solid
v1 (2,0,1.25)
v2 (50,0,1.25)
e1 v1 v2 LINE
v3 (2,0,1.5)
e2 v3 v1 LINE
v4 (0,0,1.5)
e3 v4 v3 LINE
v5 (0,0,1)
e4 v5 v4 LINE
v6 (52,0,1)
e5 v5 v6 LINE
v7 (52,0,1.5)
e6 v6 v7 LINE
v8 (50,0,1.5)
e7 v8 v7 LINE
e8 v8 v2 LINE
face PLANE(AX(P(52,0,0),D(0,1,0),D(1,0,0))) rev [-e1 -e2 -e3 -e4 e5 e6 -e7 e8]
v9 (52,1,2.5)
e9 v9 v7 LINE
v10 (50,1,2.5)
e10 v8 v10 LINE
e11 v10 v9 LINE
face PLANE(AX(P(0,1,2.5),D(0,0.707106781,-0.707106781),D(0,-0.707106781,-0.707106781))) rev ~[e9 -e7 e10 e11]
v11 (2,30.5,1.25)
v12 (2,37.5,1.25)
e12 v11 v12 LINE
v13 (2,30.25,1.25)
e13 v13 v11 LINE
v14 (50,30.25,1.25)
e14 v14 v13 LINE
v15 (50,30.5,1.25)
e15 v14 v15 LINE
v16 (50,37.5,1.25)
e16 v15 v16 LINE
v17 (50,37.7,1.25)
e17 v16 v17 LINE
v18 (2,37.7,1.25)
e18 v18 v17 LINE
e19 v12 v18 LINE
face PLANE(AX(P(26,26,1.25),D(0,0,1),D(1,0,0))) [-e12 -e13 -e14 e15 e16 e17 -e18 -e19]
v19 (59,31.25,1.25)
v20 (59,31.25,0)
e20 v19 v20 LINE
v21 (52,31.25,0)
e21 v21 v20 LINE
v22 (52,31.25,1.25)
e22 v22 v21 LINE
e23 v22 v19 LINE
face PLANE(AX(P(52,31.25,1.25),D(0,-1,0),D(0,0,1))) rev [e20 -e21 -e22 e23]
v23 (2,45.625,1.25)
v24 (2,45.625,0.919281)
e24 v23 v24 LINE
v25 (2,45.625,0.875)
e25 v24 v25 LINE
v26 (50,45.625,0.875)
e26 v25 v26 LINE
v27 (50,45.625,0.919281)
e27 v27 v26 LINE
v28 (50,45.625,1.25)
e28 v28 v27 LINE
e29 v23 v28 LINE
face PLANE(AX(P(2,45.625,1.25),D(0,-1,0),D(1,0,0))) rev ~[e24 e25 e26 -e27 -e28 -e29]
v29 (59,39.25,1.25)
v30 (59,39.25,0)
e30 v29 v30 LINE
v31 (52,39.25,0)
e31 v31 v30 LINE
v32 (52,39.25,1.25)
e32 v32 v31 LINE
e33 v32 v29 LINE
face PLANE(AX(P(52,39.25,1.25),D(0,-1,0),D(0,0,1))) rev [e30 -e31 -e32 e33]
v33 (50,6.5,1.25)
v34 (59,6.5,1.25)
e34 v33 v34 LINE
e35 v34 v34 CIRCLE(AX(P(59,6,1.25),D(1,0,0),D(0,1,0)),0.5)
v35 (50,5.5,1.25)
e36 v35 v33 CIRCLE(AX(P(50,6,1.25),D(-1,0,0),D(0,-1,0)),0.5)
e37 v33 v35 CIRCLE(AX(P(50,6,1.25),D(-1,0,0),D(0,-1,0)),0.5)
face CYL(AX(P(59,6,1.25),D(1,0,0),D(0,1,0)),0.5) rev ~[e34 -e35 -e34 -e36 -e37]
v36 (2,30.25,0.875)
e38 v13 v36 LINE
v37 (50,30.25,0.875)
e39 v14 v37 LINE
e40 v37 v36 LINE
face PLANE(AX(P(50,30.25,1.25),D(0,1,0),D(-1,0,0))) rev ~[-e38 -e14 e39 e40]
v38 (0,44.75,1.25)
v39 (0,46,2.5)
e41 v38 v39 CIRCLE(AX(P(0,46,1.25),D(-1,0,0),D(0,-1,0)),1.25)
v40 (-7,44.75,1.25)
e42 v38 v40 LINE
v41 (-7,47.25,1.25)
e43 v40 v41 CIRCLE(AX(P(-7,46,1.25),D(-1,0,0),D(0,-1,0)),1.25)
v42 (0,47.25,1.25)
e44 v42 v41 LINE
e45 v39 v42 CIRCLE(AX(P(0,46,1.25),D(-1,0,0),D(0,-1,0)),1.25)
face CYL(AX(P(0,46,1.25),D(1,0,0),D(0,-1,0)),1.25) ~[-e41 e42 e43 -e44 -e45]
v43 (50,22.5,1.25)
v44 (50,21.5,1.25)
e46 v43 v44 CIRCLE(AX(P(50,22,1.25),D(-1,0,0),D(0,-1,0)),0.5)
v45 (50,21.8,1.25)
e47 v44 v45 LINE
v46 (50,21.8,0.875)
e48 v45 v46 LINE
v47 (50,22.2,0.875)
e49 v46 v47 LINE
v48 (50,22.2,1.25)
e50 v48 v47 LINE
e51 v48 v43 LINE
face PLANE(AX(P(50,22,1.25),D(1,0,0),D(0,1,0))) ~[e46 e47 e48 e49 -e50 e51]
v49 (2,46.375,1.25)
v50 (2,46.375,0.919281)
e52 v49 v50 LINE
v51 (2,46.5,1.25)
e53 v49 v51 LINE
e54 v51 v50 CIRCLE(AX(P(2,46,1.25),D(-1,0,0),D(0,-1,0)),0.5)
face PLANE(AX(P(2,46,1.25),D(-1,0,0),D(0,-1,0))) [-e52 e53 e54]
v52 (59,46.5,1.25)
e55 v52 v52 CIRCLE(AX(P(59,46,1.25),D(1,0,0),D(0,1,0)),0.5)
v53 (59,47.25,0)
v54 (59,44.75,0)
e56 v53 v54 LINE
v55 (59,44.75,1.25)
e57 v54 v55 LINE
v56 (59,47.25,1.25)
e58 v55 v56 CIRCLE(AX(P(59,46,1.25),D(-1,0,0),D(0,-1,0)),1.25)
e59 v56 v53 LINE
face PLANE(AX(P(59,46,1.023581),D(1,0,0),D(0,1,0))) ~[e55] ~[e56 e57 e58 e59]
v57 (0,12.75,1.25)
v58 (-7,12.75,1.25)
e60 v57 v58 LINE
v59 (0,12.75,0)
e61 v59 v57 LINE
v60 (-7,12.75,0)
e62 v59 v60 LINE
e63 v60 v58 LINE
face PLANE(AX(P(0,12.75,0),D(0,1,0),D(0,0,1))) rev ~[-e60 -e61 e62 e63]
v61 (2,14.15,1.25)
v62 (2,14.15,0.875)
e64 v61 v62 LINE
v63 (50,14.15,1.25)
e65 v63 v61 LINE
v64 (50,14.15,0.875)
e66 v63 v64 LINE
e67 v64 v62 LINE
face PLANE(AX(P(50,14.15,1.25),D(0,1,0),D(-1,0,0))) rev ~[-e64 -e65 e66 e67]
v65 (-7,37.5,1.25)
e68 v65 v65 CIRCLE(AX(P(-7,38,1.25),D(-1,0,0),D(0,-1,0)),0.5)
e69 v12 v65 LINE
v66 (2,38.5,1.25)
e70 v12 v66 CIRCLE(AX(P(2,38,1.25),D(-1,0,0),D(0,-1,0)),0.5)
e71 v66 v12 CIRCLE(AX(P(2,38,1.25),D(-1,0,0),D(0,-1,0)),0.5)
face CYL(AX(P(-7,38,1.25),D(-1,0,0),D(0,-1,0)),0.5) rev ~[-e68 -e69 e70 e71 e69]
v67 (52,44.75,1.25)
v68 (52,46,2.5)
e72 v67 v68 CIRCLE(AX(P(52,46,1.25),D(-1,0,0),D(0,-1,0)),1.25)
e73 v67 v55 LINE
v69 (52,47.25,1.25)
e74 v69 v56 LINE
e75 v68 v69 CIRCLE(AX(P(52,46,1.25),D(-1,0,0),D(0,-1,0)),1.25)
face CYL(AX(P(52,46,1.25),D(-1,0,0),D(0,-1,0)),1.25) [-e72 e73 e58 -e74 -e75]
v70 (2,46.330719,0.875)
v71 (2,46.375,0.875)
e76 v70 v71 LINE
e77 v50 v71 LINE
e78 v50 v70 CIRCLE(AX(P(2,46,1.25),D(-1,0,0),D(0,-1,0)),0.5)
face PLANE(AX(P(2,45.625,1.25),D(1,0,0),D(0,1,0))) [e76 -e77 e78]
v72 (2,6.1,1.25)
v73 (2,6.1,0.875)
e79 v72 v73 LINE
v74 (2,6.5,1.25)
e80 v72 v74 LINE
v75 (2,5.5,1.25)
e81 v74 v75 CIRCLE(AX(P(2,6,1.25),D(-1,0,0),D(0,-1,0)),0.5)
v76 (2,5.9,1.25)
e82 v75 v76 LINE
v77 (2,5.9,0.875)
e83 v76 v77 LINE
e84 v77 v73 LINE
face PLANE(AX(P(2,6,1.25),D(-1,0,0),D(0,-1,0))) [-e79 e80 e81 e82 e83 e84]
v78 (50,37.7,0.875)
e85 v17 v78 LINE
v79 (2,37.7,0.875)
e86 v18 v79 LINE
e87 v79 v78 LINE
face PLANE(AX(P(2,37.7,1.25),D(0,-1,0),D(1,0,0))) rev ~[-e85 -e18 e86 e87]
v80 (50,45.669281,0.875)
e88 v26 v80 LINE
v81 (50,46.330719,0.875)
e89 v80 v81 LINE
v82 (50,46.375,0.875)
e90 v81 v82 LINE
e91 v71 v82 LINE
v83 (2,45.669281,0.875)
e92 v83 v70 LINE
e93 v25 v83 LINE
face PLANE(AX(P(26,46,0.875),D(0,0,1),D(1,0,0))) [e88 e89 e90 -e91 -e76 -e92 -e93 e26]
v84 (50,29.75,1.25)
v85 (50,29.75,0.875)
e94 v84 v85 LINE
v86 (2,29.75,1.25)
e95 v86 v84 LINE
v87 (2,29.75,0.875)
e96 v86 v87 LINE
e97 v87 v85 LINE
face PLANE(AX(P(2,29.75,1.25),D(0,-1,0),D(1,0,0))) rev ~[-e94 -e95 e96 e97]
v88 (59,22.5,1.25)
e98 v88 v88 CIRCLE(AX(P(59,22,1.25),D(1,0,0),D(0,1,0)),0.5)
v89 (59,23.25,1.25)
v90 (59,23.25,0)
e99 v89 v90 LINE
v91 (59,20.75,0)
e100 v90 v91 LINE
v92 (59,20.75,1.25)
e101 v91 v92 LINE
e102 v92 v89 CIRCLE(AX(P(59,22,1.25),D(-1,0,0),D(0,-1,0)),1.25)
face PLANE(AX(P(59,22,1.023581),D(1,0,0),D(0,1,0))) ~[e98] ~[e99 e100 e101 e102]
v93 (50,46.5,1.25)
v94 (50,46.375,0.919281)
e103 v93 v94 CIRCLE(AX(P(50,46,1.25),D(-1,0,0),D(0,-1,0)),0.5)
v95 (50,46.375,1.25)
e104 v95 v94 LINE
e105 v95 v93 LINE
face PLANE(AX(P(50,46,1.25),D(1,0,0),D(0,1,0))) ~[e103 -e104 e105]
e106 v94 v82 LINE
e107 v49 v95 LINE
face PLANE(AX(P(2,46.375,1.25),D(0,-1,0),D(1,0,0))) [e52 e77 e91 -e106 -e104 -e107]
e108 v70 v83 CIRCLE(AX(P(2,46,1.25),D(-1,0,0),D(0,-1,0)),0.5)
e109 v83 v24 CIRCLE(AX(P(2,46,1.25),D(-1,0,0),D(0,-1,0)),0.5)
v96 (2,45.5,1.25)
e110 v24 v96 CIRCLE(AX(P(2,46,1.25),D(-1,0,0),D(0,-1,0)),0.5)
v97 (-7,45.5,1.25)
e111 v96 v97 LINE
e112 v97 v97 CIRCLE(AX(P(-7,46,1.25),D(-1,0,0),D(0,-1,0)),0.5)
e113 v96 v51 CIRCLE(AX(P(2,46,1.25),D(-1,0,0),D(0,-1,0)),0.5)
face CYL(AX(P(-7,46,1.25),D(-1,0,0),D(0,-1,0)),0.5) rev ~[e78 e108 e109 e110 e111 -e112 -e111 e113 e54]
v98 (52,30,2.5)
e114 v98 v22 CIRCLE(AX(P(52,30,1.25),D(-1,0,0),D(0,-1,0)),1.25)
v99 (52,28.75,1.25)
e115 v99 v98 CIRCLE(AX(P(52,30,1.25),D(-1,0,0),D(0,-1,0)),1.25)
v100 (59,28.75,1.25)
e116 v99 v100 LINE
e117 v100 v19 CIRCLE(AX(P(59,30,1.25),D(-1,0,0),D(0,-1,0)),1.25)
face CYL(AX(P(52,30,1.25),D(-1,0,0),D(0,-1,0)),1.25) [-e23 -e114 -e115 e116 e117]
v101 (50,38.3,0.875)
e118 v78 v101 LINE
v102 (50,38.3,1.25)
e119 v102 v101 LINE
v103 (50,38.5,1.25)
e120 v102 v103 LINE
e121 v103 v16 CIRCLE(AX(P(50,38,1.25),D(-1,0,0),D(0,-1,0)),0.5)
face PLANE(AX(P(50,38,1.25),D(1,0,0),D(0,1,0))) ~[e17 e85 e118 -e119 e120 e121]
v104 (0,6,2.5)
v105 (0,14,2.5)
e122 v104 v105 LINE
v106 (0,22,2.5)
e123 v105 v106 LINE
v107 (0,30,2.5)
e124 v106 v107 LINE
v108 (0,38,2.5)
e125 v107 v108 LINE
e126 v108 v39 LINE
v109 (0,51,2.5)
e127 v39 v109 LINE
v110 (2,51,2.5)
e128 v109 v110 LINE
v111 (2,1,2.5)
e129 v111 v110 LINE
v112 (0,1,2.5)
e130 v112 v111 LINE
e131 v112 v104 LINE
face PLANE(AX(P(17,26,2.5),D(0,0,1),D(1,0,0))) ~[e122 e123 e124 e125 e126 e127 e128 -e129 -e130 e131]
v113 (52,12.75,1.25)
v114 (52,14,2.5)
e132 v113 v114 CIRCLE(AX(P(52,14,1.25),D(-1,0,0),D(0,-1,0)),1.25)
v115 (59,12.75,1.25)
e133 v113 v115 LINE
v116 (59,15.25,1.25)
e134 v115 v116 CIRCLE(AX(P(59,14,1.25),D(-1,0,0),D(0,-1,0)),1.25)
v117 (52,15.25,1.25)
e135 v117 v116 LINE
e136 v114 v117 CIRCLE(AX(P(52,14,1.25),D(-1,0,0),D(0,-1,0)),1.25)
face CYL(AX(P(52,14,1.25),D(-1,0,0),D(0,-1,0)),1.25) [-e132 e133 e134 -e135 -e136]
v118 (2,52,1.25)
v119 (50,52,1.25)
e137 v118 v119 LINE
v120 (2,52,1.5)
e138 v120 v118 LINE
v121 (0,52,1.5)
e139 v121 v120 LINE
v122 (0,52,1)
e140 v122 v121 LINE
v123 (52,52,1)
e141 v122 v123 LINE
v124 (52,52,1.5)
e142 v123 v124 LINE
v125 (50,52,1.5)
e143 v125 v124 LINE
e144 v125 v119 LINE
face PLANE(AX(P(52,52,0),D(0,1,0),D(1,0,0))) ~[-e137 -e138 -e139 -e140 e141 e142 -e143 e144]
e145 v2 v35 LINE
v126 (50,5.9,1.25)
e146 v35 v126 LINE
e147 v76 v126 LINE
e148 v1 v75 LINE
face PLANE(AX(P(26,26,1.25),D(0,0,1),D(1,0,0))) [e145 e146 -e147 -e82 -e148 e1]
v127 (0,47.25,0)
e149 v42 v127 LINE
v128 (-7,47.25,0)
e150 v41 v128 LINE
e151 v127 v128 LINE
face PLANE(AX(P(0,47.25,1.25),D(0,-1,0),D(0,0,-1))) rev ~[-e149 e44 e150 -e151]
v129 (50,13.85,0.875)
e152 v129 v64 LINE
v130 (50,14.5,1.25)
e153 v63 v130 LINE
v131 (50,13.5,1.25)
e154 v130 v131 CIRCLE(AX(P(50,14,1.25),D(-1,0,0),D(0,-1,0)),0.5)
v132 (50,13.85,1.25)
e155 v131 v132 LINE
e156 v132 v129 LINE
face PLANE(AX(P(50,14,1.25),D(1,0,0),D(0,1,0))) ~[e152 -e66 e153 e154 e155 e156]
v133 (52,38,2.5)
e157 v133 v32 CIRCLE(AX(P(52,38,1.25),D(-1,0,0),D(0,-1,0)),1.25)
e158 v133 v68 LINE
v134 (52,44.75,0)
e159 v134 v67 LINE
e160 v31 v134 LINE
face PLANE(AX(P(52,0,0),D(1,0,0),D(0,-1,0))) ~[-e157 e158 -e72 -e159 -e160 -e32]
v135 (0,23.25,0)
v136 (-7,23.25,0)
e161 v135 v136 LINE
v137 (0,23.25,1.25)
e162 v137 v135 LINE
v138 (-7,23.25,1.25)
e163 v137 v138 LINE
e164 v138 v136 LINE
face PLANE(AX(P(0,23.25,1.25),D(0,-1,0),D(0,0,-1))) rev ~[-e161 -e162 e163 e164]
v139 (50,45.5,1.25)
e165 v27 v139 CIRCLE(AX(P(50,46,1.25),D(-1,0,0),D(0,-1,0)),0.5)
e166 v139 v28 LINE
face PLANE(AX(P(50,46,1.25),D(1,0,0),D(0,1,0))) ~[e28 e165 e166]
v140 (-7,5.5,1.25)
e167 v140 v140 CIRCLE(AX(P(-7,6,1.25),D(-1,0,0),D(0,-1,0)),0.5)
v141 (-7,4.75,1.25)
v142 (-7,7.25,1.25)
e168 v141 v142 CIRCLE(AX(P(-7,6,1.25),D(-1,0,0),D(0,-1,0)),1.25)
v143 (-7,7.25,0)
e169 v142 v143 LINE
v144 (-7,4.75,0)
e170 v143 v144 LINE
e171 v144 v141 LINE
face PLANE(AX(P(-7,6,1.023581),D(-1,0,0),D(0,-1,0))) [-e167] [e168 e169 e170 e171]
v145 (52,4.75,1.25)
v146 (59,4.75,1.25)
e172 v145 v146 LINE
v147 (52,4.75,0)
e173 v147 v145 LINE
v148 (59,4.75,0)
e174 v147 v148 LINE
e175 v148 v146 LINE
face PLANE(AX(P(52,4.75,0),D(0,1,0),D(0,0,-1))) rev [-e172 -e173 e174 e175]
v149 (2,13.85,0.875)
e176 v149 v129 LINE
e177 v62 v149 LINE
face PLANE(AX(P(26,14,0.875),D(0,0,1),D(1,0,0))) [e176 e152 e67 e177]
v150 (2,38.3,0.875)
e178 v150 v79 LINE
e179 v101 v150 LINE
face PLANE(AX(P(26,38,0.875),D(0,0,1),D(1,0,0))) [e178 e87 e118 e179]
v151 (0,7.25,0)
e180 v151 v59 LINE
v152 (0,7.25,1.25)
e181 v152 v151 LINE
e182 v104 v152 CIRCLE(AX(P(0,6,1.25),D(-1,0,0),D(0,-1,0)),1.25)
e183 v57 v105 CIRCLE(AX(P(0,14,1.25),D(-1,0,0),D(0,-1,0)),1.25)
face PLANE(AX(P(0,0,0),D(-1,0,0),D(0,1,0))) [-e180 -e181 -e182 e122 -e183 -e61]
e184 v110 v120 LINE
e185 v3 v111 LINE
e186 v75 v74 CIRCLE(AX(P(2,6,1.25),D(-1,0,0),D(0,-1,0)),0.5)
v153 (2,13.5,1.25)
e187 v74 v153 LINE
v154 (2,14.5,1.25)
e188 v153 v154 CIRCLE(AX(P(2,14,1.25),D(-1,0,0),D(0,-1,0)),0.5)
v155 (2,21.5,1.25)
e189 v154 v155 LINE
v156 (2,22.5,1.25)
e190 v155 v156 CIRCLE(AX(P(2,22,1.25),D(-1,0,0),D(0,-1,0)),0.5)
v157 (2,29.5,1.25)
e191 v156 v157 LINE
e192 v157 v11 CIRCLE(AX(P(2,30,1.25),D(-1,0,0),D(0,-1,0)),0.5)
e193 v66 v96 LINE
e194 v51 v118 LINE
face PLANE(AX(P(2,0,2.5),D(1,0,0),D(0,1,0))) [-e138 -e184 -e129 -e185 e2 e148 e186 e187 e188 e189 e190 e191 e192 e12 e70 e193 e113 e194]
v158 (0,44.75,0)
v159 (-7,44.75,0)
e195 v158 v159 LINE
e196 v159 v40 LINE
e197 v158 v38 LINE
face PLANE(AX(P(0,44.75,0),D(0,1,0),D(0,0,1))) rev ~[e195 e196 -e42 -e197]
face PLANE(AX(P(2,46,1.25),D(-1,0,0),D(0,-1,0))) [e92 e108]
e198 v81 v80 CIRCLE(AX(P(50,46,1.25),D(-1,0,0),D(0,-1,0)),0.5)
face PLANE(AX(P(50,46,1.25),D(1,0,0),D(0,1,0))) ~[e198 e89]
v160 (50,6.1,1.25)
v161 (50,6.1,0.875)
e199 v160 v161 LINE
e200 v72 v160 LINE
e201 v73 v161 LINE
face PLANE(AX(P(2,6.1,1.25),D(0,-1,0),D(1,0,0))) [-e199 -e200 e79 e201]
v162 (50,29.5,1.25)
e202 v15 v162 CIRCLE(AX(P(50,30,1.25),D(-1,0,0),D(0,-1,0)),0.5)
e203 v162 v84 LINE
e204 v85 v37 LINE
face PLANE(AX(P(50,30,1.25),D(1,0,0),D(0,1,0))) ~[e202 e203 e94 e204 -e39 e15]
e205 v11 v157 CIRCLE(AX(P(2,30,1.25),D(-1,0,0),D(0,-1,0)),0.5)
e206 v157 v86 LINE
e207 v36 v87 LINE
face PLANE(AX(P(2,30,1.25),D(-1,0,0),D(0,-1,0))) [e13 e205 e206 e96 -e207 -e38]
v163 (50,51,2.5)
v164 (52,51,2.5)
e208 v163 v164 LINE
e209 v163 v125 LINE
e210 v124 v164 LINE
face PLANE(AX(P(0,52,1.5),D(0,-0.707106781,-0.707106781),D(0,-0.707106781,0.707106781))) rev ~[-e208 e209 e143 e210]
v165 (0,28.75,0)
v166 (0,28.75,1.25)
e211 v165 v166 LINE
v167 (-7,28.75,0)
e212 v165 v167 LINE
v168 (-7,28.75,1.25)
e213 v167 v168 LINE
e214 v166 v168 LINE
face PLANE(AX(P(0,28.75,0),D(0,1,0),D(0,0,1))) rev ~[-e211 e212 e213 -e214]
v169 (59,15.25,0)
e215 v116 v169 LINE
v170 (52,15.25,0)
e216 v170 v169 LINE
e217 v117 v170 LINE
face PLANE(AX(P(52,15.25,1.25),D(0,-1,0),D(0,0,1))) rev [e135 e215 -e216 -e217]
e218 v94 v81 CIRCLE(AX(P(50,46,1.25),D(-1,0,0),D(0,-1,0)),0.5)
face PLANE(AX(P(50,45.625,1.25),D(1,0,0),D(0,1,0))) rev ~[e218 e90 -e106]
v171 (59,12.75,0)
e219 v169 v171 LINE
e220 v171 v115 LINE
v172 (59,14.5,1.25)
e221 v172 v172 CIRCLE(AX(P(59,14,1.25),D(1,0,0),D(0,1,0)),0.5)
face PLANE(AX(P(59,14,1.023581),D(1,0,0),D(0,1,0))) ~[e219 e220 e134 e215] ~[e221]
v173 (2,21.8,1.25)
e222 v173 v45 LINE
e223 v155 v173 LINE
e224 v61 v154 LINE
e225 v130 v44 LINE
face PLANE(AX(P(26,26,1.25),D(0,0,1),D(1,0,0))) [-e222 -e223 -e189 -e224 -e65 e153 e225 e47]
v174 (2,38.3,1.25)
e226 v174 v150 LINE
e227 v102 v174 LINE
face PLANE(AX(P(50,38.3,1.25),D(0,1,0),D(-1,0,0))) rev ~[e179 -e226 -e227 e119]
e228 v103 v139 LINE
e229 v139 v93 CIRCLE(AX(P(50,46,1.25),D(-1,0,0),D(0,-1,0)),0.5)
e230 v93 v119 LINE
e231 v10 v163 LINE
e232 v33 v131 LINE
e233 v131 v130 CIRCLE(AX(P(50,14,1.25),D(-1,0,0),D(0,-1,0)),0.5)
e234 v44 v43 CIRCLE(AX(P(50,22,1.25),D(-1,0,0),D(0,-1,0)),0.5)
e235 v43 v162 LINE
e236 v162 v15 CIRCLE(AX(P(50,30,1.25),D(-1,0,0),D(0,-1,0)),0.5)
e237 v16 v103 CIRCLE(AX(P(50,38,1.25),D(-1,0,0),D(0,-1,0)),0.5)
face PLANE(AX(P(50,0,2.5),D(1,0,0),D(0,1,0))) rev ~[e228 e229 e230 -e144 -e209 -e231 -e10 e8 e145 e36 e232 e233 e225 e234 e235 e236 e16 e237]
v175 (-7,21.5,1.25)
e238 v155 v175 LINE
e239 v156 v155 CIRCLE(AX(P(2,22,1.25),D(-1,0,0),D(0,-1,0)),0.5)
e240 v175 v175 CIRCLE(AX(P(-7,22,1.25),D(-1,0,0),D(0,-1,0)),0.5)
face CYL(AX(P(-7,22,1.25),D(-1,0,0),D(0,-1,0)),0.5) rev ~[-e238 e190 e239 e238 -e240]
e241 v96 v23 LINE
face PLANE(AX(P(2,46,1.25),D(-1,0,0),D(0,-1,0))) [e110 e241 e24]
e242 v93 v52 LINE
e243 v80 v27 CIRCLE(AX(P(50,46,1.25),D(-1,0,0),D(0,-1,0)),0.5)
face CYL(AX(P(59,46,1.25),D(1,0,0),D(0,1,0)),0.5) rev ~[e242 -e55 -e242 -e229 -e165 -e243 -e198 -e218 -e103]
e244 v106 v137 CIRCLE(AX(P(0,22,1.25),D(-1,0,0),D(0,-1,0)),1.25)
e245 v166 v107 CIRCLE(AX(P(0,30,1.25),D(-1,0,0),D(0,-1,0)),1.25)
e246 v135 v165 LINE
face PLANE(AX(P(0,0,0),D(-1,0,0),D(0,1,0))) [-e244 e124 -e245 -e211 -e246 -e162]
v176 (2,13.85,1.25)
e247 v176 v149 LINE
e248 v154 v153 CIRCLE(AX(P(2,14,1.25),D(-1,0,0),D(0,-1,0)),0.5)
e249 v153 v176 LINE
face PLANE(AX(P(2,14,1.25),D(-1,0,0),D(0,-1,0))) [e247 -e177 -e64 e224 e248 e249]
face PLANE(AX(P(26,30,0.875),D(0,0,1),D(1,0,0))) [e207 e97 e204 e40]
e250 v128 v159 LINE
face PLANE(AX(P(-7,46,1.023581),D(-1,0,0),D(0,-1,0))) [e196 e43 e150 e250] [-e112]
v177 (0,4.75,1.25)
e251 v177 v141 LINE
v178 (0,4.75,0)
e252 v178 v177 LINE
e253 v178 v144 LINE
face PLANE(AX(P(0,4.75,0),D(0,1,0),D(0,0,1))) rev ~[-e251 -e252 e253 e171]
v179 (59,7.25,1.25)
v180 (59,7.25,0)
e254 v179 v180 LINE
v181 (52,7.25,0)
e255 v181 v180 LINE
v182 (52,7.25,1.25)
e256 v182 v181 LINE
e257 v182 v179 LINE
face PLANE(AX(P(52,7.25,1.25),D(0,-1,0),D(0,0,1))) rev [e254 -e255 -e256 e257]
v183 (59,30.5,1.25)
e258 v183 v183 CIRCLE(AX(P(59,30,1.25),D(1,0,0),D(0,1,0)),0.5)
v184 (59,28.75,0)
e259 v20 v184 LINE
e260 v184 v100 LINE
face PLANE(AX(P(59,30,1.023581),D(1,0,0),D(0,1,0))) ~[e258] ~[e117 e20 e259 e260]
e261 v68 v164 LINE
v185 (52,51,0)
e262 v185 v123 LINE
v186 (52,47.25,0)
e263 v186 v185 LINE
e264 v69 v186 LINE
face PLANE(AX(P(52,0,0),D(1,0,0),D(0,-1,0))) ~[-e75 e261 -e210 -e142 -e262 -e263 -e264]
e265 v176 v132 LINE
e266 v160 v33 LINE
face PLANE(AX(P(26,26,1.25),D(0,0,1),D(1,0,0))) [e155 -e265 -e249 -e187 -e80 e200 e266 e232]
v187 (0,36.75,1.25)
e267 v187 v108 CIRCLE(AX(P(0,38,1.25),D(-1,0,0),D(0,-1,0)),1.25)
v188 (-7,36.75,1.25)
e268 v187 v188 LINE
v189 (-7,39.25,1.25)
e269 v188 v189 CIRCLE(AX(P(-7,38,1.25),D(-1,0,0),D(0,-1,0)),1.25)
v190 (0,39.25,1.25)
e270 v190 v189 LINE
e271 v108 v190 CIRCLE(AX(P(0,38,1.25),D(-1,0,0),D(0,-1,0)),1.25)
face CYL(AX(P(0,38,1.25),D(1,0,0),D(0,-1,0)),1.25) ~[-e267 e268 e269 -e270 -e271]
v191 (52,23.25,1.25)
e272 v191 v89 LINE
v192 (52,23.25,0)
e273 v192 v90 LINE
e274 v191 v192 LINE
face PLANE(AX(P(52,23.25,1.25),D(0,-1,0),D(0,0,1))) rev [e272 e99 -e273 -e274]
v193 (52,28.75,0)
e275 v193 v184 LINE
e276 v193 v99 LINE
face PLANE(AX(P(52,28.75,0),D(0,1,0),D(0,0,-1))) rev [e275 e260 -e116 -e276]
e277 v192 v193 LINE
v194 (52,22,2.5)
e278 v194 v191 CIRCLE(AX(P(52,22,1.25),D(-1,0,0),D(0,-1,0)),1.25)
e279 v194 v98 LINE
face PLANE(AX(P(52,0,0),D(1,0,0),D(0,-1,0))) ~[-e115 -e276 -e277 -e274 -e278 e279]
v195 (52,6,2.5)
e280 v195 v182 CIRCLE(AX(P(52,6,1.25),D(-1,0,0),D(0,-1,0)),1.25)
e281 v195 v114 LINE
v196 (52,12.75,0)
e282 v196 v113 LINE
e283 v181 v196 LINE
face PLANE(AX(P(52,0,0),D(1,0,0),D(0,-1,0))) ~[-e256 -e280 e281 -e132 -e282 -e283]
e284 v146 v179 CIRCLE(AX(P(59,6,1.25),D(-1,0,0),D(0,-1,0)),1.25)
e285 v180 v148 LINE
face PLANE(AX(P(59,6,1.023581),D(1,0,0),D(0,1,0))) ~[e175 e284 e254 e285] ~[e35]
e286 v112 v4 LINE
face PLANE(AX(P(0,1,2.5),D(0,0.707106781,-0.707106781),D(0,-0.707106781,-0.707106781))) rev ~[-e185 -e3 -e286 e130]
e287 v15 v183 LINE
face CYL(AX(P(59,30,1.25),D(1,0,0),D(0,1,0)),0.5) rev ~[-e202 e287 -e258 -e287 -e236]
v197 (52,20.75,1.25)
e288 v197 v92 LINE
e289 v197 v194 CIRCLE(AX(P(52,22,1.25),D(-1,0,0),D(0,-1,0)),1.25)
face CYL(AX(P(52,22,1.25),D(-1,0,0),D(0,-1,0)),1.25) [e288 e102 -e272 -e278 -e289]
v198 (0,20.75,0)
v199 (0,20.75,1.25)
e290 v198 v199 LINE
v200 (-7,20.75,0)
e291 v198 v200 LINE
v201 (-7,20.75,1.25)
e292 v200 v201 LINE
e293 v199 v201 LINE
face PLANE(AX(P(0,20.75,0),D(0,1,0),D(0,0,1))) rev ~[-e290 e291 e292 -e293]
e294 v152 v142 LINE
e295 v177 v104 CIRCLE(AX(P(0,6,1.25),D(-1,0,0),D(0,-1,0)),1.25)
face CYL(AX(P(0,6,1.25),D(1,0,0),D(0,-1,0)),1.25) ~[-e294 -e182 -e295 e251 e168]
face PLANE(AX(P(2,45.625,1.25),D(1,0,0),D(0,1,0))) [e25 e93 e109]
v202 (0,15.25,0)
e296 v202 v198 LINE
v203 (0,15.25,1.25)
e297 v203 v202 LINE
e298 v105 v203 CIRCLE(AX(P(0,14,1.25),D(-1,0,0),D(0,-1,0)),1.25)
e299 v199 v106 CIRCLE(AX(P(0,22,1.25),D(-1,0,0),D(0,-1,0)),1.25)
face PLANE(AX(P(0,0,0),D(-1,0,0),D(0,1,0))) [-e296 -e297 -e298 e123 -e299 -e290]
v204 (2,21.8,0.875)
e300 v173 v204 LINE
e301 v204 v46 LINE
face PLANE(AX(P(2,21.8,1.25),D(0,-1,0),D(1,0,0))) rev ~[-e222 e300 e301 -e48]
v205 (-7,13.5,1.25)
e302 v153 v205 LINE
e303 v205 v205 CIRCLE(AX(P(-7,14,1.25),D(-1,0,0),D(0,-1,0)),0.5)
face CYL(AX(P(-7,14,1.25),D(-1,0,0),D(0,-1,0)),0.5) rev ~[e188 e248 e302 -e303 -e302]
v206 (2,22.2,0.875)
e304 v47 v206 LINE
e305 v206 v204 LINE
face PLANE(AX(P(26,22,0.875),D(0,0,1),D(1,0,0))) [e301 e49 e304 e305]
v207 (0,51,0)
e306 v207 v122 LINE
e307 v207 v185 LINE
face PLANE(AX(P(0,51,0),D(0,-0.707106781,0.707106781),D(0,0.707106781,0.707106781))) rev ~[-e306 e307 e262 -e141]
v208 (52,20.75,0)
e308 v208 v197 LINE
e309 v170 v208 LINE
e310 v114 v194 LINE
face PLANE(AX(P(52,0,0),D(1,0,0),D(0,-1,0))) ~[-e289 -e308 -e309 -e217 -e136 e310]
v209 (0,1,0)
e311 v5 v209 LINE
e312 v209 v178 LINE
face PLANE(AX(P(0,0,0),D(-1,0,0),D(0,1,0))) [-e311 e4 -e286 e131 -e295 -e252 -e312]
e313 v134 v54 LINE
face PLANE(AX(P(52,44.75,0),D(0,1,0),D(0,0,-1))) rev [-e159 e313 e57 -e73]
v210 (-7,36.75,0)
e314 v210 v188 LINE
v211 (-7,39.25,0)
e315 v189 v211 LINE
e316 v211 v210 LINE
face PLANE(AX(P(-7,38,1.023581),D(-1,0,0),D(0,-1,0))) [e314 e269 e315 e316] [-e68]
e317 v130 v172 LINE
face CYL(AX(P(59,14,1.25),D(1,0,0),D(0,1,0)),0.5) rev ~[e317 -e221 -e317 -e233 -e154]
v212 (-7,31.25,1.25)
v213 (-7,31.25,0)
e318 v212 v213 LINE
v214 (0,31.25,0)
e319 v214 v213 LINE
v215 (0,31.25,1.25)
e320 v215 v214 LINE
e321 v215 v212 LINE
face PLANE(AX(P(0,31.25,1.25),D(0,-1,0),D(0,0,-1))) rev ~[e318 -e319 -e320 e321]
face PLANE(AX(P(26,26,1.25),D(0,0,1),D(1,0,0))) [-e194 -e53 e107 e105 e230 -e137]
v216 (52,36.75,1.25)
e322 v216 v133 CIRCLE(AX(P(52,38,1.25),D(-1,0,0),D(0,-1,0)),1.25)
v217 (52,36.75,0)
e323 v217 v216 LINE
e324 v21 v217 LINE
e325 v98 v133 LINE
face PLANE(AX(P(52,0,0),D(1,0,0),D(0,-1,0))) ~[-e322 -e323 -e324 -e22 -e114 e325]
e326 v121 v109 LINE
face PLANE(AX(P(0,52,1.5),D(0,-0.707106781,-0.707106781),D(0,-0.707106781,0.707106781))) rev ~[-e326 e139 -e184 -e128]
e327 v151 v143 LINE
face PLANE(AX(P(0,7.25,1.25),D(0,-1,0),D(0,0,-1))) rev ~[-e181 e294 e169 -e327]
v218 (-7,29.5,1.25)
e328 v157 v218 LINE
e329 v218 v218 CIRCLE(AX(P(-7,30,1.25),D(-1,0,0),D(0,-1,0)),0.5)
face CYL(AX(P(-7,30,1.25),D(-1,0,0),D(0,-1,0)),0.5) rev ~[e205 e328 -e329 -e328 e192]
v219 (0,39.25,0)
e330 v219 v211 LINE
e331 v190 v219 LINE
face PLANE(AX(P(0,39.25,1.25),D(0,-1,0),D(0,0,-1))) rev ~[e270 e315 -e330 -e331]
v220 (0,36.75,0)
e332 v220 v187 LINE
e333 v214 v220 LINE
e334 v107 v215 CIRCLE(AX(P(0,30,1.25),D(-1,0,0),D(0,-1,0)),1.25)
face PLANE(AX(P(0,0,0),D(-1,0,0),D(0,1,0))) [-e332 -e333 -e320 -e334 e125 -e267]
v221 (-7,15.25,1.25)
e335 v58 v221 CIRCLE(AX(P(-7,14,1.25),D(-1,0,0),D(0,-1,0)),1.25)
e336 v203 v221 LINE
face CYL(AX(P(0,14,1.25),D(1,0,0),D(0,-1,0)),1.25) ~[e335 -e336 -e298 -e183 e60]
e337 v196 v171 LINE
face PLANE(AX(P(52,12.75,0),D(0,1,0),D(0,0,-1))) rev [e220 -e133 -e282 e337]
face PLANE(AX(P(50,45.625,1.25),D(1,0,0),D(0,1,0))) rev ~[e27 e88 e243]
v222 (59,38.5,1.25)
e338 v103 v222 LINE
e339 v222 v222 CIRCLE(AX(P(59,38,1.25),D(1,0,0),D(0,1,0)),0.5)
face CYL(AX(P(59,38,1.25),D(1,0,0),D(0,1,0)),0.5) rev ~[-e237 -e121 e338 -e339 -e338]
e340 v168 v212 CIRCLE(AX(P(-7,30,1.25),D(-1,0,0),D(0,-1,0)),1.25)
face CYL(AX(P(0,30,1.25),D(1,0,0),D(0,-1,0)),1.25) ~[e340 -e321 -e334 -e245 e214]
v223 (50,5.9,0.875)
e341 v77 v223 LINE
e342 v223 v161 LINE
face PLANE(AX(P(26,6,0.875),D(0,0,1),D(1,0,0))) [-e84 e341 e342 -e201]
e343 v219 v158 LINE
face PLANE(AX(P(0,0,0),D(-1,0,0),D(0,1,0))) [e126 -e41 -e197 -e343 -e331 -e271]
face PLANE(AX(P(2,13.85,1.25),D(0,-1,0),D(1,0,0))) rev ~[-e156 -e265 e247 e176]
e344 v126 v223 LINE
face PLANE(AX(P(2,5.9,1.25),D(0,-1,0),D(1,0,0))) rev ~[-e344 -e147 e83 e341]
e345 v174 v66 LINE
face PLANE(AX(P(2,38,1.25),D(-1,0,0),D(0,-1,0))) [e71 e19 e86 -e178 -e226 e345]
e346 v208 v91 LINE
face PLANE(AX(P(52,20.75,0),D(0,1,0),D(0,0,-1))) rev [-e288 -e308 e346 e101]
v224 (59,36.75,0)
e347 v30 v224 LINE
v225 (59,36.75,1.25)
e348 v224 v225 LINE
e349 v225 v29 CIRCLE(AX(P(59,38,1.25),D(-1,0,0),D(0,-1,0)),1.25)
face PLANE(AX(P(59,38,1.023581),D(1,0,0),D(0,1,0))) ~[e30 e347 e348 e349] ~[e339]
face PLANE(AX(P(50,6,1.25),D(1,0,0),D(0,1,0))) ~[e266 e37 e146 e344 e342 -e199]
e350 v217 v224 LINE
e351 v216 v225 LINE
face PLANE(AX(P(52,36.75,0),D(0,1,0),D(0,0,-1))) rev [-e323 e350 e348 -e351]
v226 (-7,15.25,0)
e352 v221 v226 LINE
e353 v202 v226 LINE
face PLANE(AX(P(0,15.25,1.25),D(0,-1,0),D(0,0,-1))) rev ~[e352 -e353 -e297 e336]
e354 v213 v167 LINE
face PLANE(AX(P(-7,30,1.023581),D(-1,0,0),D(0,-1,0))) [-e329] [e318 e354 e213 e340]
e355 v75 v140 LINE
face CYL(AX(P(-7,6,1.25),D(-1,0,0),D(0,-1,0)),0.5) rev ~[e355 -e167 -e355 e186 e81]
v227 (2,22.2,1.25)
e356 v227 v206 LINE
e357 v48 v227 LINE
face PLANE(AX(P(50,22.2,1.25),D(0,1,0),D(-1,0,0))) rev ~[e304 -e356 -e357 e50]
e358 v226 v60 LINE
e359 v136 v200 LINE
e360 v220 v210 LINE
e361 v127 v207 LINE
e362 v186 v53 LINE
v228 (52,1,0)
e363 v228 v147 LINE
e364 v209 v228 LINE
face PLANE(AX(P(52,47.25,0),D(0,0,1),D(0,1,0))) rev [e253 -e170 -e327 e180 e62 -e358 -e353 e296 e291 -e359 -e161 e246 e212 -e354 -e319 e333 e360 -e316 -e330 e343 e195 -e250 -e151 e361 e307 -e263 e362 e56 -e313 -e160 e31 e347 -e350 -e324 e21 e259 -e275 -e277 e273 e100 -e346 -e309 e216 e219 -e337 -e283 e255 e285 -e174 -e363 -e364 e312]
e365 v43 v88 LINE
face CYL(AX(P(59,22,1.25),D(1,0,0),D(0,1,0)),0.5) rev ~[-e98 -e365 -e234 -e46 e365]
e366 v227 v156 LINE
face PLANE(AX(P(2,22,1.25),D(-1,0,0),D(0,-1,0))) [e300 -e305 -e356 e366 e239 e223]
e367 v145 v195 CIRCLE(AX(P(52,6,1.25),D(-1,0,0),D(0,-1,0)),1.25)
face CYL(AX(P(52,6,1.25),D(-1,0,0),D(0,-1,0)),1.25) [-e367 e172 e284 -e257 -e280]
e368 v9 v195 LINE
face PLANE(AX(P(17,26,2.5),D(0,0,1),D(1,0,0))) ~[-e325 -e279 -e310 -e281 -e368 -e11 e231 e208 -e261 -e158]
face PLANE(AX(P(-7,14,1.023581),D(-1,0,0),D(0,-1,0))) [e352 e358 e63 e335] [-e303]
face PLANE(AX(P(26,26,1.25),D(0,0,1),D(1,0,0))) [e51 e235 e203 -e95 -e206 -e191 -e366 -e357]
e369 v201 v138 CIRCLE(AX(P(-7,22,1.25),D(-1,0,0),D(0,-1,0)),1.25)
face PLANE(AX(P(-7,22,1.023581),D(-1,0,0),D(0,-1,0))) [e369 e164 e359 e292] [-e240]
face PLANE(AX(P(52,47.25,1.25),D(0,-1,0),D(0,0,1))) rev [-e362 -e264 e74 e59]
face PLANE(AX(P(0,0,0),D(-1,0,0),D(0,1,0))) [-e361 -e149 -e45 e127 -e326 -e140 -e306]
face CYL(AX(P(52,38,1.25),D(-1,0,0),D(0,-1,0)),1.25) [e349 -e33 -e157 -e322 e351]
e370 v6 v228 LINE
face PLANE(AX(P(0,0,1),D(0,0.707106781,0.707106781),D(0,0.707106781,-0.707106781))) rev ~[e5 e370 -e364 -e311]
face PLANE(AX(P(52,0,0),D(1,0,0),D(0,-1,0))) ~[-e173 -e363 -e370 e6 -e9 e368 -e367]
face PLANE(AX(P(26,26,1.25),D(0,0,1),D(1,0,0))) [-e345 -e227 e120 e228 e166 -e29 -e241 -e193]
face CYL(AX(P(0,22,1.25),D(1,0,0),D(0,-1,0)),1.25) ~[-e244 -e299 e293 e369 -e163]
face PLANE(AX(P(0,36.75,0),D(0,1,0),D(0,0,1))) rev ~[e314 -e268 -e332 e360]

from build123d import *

# Parameters (mm, degrees)
F0_W      = 70
F0_H      = 52
F1_DEPTH  = 2.5
F2_R      = 0.5
F3_DEPTH  = 2
F5_DEPTH  = 7
F6_W      = 44
F6_H      = 52
F7_DEPTH  = 25
F10_W     = 48
F10_H     = 52
F11_DEPTH = 1.25
F12_W     = 48
F12_H     = 0.2
F12_H_2   = 0.75
F13_DEPTH = 0.375
F15_DEPTH = 60
F16_R     = 0.5
F17_DEPTH = 9
F18_R     = 0.5
F19_DEPTH = 9


# Not quite as in the source:
# - a feature names something its author has since deleted; it is built from what else it names


with BuildPart() as f1:
    # F0 (on Top) → F1 (new body)
    with BuildSketch(Plane.XY):
        with Locations((35, 26)):
            Rectangle(F0_W, F0_H)
    extrude(amount=F1_DEPTH)

    # F2 (on face) → F3 (cut)
    with BuildSketch(Plane(origin=(0, 0, 0), x_dir=(0, -1, 0), z_dir=(-1, 0, 0))):
        with Locations((-46, 1.25)):
            Circle(F2_R)
        with Locations((-38, 1.25)):
            Circle(F2_R)
        with Locations((-30, 1.25)):
            Circle(F2_R)
        with Locations((-22, 1.25)):
            Circle(F2_R)
        with Locations((-14, 1.25)):
            Circle(F2_R)
        with Locations((-6, 1.25)):
            Circle(F2_R)
    extrude(amount=-F3_DEPTH, mode=Mode.SUBTRACT)

    # F4 (on face) → F5 (join)
    with BuildSketch(Plane(origin=(0, 0, 0), x_dir=(0, -1, 0), z_dir=(-1, 0, 0))):
        with BuildLine():
            Line((-44.75, 0), (-44.75, 1.25))
            ThreePointArc((-44.75, 1.25), (-46, 2.5), (-47.25, 1.25))
            Line((-47.25, 1.25), (-47.25, 0))
            Line((-47.25, 0), (-44.75, 0))
        make_face()
        with BuildLine():
            Line((-36.75, 0), (-36.75, 1.25))
            ThreePointArc((-36.75, 1.25), (-38, 2.5), (-39.25, 1.25))
            Line((-39.25, 1.25), (-39.25, 0))
            Line((-39.25, 0), (-36.75, 0))
        make_face()
        with BuildLine():
            Line((-28.75, 0), (-28.75, 1.25))
            ThreePointArc((-28.75, 1.25), (-30, 2.5), (-31.25, 1.25))
            Line((-31.25, 1.25), (-31.25, 0))
            Line((-31.25, 0), (-28.75, 0))
        make_face()
        with BuildLine():
            Line((-20.75, 0), (-20.75, 1.25))
            ThreePointArc((-20.75, 1.25), (-22, 2.5), (-23.25, 1.25))
            Line((-23.25, 1.25), (-23.25, 0))
            Line((-23.25, 0), (-20.75, 0))
        make_face()
        with BuildLine():
            Line((-12.75, 0), (-12.75, 1.25))
            ThreePointArc((-12.75, 1.25), (-14, 2.5), (-15.25, 1.25))
            Line((-15.25, 1.25), (-15.25, 0))
            Line((-15.25, 0), (-12.75, 0))
        make_face()
        with BuildLine():
            Line((-4.75, 0), (-4.75, 1.25))
            ThreePointArc((-4.75, 1.25), (-6, 2.5), (-7.25, 1.25))
            Line((-7.25, 1.25), (-7.25, 0))
            Line((-7.25, 0), (-4.75, 0))
        make_face()
    extrude(amount=F5_DEPTH)

    # F6 (on face) → F7 (cut)
    with BuildSketch(Plane.XY.offset(2.5)):
        with Locations((48, 26)):
            Rectangle(F6_W, F6_H)
    extrude(amount=-F7_DEPTH, mode=Mode.SUBTRACT)

    # F9: F1 across plane


with BuildPart() as f1_1:
    add(f1.part)
    add(f1.part.mirror(Plane(origin=(26, 26, 1.25), x_dir=(0, 1, 0), z_dir=(1, 0, 0))))

    # F10 (on face) → F11 (cut)
    with BuildSketch(Plane.XY.offset(2.5)):
        with Locations((26, 26)):
            Rectangle(F10_W, F10_H)
    extrude(amount=-F11_DEPTH, mode=Mode.SUBTRACT)

    # F12 (on face) → F13 (cut)
    with BuildSketch(Plane.XY.offset(1.25)):
        with Locations((26, 6)):
            Rectangle(F12_W, F12_H)
        with Locations((26, 46)):
            Rectangle(F12_W, F12_H_2)
        Polygon((2, 14.15), (2, 14), (2, 13.85), (50, 13.85), (50, 14.15), align=None)
        Polygon((2, 22.2), (2, 22), (2, 21.8), (50, 21.8), (50, 22.2), align=None)
        Polygon((2, 30.25), (2, 30), (2, 29.75), (50, 29.75), (50, 30.25), align=None)
        Polygon((2, 38.3), (2, 38), (2, 37.7), (50, 37.7), (50, 38.3), align=None)
    extrude(amount=-F13_DEPTH, mode=Mode.SUBTRACT)

    # F14 (on face) → F15 (cut)
    with BuildSketch(Plane(origin=(0, 0, 0), x_dir=(0, -1, 0), z_dir=(-1, 0, 0))):
        Polygon((-51, 2.5), (-52, 2.5), (-52, 1.5), align=None)
        Polygon((-52, 1), (-52, 0), (-51, 0), align=None)
        Polygon((-1, 0), (0, 0), (0, 1), align=None)
        Polygon((0, 1.5), (0, 2.5), (-1, 2.5), align=None)
    extrude(amount=-F15_DEPTH, mode=Mode.SUBTRACT)

    # F16 (on face) → F17 (cut)
    with BuildSketch(Plane(origin=(-7, 0, 0), x_dir=(0, -1, 0), z_dir=(-1, 0, 0))):
        with Locations((-46, 1.25)):
            Circle(F16_R)
        with Locations((-38, 1.25)):
            Circle(F16_R)
        with Locations((-30, 1.25)):
            Circle(F16_R)
        with Locations((-22, 1.25)):
            Circle(F16_R)
        with Locations((-14, 1.25)):
            Circle(F16_R)
        with Locations((-6, 1.25)):
            Circle(F16_R)
    extrude(amount=-F17_DEPTH, mode=Mode.SUBTRACT)

    # F18 (on face) → F19 (cut)
    with BuildSketch(Plane.YZ.offset(59)):
        with Locations((6, 1.25)):
            Circle(F18_R)
        with Locations((14, 1.25)):
            Circle(F18_R)
        with Locations((22, 1.25)):
            Circle(F18_R)
        with Locations((30, 1.25)):
            Circle(F18_R)
        with Locations((38, 1.25)):
            Circle(F18_R)
        with Locations((46, 1.25)):
            Circle(F18_R)
    extrude(amount=-F19_DEPTH, mode=Mode.SUBTRACT)


solid = f1_1.part
